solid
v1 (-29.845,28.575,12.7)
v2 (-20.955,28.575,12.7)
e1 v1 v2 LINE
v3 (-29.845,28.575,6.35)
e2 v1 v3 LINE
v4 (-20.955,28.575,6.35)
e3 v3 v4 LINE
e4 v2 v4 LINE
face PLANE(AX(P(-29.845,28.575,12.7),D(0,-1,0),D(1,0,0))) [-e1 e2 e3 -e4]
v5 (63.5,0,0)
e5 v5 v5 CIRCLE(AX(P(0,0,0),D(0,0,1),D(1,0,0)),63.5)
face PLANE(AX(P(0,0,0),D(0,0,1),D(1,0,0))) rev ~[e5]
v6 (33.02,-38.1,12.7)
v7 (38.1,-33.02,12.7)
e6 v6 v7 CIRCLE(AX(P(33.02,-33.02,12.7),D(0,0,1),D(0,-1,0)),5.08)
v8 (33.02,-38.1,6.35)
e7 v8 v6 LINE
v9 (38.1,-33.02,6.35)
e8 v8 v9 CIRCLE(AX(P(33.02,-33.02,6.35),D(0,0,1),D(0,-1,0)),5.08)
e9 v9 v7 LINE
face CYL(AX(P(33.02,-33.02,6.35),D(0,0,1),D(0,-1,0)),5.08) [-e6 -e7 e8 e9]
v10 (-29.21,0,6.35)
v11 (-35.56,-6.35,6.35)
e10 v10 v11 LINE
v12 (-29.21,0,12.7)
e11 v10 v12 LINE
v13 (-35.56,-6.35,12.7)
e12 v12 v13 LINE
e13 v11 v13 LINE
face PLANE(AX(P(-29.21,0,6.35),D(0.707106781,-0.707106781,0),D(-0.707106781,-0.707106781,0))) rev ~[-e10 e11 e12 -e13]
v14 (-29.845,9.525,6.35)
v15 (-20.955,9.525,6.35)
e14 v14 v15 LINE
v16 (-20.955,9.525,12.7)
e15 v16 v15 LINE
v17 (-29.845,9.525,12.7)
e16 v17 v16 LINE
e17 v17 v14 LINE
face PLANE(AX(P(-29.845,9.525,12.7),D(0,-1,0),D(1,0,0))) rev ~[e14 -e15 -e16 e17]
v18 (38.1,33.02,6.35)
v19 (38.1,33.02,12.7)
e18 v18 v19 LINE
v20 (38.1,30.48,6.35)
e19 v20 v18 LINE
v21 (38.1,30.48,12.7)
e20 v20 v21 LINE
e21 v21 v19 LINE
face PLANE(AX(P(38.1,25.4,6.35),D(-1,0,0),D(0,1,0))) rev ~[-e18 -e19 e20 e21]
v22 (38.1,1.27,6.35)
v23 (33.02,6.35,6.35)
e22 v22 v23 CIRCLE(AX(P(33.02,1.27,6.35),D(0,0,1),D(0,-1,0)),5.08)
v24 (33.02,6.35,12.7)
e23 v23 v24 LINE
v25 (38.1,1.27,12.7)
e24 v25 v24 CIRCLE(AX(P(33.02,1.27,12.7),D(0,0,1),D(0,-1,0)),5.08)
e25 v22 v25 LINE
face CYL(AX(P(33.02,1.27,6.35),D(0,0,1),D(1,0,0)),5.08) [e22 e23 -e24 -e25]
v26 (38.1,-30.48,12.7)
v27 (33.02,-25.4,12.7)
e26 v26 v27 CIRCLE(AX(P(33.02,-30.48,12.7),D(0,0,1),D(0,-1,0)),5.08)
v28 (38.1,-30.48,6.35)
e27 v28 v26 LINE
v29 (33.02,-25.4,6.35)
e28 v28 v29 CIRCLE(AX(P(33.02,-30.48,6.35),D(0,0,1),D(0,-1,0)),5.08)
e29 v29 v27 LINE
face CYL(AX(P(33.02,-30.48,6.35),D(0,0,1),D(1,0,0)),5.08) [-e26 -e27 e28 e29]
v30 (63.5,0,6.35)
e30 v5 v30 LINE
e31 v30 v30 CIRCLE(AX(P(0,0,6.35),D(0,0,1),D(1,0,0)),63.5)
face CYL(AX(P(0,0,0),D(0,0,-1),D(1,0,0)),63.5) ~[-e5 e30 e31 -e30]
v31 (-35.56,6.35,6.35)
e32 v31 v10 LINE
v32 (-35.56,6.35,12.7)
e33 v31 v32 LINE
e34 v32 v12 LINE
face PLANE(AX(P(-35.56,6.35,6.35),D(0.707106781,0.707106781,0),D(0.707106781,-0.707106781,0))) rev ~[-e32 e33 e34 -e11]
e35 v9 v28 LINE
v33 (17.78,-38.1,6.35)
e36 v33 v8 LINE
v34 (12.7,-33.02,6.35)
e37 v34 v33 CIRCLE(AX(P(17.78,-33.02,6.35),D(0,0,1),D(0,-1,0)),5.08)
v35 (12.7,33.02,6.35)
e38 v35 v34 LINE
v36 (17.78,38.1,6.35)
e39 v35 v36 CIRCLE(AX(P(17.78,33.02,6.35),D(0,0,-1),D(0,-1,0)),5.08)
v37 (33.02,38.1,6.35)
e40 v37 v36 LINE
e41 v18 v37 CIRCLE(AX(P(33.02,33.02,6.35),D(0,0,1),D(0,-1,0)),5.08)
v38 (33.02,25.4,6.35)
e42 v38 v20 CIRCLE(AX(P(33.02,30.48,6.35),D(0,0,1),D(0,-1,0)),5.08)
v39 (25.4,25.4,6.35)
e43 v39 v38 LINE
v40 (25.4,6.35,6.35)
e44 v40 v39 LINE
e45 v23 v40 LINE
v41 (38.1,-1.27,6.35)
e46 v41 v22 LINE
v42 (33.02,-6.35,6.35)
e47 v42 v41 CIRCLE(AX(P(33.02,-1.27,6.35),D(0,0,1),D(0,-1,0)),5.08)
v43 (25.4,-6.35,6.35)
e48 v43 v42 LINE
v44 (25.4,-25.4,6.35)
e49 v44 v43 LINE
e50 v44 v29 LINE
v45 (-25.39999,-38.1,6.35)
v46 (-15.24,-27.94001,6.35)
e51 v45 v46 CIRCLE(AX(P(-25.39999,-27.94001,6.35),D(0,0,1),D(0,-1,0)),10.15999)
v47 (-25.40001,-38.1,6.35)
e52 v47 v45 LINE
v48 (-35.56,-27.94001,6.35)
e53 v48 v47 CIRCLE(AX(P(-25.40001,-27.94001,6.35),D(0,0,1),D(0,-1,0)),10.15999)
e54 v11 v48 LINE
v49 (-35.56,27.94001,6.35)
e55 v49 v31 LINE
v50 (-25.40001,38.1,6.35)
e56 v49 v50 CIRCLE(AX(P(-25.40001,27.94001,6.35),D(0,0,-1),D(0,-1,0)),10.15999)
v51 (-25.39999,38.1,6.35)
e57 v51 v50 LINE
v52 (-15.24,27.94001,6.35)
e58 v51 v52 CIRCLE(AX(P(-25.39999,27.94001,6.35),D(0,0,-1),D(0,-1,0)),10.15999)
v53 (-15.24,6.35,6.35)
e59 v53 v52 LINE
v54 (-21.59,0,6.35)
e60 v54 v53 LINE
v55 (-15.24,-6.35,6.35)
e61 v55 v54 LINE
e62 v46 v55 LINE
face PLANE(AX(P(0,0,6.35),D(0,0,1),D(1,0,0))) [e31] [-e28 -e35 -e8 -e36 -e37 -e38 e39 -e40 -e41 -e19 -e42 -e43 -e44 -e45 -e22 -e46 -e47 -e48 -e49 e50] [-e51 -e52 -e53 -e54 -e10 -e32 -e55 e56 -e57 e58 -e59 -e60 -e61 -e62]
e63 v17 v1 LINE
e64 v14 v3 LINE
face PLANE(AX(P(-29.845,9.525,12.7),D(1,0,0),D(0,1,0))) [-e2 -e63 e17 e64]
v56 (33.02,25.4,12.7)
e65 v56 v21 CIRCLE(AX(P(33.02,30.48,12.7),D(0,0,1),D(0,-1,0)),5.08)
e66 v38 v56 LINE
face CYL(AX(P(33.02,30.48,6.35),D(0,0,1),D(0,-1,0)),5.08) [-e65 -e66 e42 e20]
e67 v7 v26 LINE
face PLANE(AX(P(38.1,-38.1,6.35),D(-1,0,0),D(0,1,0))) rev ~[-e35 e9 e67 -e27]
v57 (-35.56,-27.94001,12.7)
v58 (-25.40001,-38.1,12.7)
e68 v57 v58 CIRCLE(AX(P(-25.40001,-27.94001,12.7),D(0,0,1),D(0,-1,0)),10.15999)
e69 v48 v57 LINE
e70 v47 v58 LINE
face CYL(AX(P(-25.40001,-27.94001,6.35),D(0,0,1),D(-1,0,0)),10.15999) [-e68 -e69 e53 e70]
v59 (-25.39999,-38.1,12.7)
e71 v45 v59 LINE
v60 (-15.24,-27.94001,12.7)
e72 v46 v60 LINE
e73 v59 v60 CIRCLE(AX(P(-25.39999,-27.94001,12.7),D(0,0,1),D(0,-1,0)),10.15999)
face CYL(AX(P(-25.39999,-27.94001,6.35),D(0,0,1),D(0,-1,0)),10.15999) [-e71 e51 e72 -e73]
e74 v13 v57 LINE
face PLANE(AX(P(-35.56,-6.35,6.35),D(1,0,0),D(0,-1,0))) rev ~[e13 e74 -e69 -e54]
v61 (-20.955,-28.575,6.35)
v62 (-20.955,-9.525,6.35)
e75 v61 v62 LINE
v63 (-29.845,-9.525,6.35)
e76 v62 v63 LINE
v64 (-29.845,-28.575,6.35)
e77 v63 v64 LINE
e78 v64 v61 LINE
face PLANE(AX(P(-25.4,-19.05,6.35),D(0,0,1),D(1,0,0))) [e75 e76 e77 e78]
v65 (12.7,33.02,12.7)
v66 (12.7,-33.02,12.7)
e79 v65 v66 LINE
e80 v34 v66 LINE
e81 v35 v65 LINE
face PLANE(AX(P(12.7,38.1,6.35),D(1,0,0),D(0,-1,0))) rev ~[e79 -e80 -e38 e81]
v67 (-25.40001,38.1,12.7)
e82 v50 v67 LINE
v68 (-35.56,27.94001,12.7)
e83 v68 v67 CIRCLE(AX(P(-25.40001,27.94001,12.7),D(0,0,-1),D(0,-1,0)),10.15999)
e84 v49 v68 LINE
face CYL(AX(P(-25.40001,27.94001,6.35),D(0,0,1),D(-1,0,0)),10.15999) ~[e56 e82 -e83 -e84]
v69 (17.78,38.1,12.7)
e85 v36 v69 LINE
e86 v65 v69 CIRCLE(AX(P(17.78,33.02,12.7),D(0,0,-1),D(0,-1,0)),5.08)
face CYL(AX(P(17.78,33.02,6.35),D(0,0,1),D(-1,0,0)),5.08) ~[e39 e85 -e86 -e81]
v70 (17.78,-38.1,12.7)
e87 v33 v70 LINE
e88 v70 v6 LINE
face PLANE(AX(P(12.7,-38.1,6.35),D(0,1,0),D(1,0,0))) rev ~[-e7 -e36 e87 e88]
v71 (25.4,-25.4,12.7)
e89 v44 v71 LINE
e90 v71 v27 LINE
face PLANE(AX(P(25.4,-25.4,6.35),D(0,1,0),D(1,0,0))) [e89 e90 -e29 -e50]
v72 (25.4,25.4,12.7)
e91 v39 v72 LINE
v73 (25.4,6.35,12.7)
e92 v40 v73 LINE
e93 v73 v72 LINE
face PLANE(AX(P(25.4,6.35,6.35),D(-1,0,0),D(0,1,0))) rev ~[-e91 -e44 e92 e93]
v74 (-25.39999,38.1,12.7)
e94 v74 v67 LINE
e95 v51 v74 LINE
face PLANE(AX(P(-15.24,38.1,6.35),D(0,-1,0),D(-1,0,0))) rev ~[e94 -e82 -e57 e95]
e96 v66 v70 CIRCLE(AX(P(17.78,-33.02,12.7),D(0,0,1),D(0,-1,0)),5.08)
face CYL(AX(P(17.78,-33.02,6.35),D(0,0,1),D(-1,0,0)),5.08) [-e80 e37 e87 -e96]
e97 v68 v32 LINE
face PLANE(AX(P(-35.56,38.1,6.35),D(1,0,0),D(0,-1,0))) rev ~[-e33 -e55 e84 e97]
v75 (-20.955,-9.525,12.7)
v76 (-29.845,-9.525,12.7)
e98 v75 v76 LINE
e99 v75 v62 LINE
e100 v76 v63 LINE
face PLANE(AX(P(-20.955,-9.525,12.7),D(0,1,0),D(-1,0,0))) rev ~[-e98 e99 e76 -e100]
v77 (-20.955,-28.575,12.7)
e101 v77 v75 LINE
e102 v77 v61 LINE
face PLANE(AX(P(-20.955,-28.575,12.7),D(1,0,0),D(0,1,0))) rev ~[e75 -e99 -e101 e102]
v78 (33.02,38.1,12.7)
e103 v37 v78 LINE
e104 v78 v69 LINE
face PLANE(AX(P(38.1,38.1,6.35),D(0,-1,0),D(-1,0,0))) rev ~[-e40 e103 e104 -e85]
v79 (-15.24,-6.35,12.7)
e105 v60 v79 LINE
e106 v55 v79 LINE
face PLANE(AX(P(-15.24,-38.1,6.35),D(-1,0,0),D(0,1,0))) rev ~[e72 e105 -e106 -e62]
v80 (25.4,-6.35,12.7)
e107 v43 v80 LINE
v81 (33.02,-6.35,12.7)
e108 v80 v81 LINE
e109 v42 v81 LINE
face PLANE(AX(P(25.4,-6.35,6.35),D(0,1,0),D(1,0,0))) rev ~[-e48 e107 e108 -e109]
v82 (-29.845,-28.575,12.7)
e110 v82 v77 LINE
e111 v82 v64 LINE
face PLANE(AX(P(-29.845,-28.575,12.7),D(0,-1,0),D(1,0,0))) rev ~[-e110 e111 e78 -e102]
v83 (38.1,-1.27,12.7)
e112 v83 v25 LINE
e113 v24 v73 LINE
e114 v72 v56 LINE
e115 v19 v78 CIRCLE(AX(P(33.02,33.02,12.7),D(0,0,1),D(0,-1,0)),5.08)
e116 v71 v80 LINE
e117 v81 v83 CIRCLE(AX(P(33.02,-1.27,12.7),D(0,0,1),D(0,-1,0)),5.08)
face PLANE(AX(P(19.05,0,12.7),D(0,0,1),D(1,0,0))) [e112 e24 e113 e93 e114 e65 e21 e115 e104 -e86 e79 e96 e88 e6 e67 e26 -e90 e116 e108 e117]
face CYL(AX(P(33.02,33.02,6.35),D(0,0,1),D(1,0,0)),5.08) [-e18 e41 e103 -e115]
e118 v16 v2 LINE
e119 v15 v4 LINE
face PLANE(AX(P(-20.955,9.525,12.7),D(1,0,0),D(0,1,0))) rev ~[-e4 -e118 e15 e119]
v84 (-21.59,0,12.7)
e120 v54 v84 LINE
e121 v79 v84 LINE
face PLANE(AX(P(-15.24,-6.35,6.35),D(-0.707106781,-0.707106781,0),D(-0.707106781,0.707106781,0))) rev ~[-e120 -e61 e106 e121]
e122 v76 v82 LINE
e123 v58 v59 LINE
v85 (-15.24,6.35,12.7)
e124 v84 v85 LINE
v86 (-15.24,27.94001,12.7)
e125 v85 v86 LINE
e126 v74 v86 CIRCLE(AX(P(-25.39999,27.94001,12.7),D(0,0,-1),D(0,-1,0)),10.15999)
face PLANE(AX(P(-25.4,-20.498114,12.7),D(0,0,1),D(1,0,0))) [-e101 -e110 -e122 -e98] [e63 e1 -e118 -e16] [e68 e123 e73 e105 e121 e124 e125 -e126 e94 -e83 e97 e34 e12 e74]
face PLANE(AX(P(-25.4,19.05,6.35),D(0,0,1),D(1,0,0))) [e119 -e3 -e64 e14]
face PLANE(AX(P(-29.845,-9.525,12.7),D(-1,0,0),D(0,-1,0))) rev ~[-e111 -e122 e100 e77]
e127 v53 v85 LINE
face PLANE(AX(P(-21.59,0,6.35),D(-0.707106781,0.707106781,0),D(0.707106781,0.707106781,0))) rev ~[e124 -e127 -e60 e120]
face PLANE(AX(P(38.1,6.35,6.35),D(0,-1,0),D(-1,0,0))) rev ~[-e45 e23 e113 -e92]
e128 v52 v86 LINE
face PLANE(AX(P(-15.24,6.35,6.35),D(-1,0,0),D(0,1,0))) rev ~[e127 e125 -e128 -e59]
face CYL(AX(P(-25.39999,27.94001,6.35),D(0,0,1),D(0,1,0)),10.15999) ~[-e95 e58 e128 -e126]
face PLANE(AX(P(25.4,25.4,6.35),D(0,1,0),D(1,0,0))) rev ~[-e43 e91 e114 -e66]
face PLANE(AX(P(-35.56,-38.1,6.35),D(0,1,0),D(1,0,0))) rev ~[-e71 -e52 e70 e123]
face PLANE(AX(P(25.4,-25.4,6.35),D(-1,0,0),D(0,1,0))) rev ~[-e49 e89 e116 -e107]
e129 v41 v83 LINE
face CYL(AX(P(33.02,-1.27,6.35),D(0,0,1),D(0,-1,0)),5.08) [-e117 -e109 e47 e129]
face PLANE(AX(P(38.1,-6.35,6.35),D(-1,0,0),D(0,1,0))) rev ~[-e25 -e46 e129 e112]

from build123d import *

# Parameters (mm, degrees)
F0_R     = 63.5
F1_DEPTH = 6.35
F3_DEPTH = 6.35
F4_W     = 12.7
F4_H     = 12.7
F5_DEPTH = 6.35
F6_R     = 10.15999
F7_R     = 5.08
F8_W     = 8.89
F8_H     = 19.05
F9_DEPTH = 6.35


# Not quite as in the source:
# - a fillet or chamfer is up to 0.001 mm smaller than in the source, because OpenCascade refuses the exact size
# - a feature names something its author has since deleted; it is built from what else it names


with BuildPart() as f1:
    # F0 (on Top) → F1 (new body)
    with BuildSketch(Plane.XY):
        Circle(F0_R)
    extrude(amount=F1_DEPTH)

    # F2 (on face) → F3 (join)
    with BuildSketch(Plane.XY.offset(6.35)):
        Polygon((-21.59, 0), (-25.4, 0), (-29.21, 0), (-35.56, -6.35), (-35.56, -38.1), (-15.24, -38.1), (-15.24, -6.35), align=None)
        Polygon((-29.21, 0), (-25.4, 0), (-21.59, 0), (-15.24, 6.35), (-15.24, 38.1), (-35.56, 38.1), (-35.56, 6.35), align=None)
    extrude(amount=F3_DEPTH)

    # F4 (on face) → F5 (join)
    with BuildSketch(Plane.XY.offset(6.35)):
        Polygon((12.7, 38.1), (12.7, 0), (12.7, -38.1), (25.4, -38.1), (25.4, -25.4), (25.4, -6.35), (25.4, 0), (25.4, 6.35), (25.4, 25.4), (25.4, 38.1), align=None)
        with Locations((31.75, 31.75)):
            Rectangle(F4_W, F4_H)
        with Locations((31.75, -31.75)):
            Rectangle(F4_W, F4_H)
        Polygon((38.1, 6.35), (25.4, 6.35), (25.4, 0), (25.4, -6.35), (38.1, -6.35), align=None)
    extrude(amount=F5_DEPTH)

    # F6 (radius 10.16 in the source; OpenCascade refuses exactly that, so slightly less here)
    f6_edges = [f1.edges().sort_by_distance(p)[0] for p in [
        (-35.56, -38.1, 9.525),
        (-15.24, -38.1, 9.525),
        (-15.24, 38.1, 9.525),
        (-35.56, 38.1, 9.525),
    ]]
    fillet(f6_edges, radius=F6_R)

    # F7
    f7_edges = [f1.edges().sort_by_distance(p)[0] for p in [
        (38.1, 6.35, 9.525),
        (38.1, -6.35, 9.525),
        (38.1, -38.1, 9.525),
        (38.1, -25.4, 9.525),
        (38.1, 25.4, 9.525),
        (38.1, 38.1, 9.525),
        (12.7, 38.1, 9.525),
        (12.7, -38.1, 9.525),
    ]]
    fillet(f7_edges, radius=F7_R)

    # F8 (on face) → F9 (cut)
    with BuildSketch(Plane.XY.offset(12.7)):
        Polygon((-29.845, -28.575), (-20.955, -28.575), (-20.955, -9.525), (-25.4, -9.525), (-29.845, -9.525), align=None)
        with Locations((-25.4, 19.05)):
            Rectangle(F8_W, F8_H)
    extrude(amount=-F9_DEPTH, mode=Mode.SUBTRACT)


solid = f1.part
